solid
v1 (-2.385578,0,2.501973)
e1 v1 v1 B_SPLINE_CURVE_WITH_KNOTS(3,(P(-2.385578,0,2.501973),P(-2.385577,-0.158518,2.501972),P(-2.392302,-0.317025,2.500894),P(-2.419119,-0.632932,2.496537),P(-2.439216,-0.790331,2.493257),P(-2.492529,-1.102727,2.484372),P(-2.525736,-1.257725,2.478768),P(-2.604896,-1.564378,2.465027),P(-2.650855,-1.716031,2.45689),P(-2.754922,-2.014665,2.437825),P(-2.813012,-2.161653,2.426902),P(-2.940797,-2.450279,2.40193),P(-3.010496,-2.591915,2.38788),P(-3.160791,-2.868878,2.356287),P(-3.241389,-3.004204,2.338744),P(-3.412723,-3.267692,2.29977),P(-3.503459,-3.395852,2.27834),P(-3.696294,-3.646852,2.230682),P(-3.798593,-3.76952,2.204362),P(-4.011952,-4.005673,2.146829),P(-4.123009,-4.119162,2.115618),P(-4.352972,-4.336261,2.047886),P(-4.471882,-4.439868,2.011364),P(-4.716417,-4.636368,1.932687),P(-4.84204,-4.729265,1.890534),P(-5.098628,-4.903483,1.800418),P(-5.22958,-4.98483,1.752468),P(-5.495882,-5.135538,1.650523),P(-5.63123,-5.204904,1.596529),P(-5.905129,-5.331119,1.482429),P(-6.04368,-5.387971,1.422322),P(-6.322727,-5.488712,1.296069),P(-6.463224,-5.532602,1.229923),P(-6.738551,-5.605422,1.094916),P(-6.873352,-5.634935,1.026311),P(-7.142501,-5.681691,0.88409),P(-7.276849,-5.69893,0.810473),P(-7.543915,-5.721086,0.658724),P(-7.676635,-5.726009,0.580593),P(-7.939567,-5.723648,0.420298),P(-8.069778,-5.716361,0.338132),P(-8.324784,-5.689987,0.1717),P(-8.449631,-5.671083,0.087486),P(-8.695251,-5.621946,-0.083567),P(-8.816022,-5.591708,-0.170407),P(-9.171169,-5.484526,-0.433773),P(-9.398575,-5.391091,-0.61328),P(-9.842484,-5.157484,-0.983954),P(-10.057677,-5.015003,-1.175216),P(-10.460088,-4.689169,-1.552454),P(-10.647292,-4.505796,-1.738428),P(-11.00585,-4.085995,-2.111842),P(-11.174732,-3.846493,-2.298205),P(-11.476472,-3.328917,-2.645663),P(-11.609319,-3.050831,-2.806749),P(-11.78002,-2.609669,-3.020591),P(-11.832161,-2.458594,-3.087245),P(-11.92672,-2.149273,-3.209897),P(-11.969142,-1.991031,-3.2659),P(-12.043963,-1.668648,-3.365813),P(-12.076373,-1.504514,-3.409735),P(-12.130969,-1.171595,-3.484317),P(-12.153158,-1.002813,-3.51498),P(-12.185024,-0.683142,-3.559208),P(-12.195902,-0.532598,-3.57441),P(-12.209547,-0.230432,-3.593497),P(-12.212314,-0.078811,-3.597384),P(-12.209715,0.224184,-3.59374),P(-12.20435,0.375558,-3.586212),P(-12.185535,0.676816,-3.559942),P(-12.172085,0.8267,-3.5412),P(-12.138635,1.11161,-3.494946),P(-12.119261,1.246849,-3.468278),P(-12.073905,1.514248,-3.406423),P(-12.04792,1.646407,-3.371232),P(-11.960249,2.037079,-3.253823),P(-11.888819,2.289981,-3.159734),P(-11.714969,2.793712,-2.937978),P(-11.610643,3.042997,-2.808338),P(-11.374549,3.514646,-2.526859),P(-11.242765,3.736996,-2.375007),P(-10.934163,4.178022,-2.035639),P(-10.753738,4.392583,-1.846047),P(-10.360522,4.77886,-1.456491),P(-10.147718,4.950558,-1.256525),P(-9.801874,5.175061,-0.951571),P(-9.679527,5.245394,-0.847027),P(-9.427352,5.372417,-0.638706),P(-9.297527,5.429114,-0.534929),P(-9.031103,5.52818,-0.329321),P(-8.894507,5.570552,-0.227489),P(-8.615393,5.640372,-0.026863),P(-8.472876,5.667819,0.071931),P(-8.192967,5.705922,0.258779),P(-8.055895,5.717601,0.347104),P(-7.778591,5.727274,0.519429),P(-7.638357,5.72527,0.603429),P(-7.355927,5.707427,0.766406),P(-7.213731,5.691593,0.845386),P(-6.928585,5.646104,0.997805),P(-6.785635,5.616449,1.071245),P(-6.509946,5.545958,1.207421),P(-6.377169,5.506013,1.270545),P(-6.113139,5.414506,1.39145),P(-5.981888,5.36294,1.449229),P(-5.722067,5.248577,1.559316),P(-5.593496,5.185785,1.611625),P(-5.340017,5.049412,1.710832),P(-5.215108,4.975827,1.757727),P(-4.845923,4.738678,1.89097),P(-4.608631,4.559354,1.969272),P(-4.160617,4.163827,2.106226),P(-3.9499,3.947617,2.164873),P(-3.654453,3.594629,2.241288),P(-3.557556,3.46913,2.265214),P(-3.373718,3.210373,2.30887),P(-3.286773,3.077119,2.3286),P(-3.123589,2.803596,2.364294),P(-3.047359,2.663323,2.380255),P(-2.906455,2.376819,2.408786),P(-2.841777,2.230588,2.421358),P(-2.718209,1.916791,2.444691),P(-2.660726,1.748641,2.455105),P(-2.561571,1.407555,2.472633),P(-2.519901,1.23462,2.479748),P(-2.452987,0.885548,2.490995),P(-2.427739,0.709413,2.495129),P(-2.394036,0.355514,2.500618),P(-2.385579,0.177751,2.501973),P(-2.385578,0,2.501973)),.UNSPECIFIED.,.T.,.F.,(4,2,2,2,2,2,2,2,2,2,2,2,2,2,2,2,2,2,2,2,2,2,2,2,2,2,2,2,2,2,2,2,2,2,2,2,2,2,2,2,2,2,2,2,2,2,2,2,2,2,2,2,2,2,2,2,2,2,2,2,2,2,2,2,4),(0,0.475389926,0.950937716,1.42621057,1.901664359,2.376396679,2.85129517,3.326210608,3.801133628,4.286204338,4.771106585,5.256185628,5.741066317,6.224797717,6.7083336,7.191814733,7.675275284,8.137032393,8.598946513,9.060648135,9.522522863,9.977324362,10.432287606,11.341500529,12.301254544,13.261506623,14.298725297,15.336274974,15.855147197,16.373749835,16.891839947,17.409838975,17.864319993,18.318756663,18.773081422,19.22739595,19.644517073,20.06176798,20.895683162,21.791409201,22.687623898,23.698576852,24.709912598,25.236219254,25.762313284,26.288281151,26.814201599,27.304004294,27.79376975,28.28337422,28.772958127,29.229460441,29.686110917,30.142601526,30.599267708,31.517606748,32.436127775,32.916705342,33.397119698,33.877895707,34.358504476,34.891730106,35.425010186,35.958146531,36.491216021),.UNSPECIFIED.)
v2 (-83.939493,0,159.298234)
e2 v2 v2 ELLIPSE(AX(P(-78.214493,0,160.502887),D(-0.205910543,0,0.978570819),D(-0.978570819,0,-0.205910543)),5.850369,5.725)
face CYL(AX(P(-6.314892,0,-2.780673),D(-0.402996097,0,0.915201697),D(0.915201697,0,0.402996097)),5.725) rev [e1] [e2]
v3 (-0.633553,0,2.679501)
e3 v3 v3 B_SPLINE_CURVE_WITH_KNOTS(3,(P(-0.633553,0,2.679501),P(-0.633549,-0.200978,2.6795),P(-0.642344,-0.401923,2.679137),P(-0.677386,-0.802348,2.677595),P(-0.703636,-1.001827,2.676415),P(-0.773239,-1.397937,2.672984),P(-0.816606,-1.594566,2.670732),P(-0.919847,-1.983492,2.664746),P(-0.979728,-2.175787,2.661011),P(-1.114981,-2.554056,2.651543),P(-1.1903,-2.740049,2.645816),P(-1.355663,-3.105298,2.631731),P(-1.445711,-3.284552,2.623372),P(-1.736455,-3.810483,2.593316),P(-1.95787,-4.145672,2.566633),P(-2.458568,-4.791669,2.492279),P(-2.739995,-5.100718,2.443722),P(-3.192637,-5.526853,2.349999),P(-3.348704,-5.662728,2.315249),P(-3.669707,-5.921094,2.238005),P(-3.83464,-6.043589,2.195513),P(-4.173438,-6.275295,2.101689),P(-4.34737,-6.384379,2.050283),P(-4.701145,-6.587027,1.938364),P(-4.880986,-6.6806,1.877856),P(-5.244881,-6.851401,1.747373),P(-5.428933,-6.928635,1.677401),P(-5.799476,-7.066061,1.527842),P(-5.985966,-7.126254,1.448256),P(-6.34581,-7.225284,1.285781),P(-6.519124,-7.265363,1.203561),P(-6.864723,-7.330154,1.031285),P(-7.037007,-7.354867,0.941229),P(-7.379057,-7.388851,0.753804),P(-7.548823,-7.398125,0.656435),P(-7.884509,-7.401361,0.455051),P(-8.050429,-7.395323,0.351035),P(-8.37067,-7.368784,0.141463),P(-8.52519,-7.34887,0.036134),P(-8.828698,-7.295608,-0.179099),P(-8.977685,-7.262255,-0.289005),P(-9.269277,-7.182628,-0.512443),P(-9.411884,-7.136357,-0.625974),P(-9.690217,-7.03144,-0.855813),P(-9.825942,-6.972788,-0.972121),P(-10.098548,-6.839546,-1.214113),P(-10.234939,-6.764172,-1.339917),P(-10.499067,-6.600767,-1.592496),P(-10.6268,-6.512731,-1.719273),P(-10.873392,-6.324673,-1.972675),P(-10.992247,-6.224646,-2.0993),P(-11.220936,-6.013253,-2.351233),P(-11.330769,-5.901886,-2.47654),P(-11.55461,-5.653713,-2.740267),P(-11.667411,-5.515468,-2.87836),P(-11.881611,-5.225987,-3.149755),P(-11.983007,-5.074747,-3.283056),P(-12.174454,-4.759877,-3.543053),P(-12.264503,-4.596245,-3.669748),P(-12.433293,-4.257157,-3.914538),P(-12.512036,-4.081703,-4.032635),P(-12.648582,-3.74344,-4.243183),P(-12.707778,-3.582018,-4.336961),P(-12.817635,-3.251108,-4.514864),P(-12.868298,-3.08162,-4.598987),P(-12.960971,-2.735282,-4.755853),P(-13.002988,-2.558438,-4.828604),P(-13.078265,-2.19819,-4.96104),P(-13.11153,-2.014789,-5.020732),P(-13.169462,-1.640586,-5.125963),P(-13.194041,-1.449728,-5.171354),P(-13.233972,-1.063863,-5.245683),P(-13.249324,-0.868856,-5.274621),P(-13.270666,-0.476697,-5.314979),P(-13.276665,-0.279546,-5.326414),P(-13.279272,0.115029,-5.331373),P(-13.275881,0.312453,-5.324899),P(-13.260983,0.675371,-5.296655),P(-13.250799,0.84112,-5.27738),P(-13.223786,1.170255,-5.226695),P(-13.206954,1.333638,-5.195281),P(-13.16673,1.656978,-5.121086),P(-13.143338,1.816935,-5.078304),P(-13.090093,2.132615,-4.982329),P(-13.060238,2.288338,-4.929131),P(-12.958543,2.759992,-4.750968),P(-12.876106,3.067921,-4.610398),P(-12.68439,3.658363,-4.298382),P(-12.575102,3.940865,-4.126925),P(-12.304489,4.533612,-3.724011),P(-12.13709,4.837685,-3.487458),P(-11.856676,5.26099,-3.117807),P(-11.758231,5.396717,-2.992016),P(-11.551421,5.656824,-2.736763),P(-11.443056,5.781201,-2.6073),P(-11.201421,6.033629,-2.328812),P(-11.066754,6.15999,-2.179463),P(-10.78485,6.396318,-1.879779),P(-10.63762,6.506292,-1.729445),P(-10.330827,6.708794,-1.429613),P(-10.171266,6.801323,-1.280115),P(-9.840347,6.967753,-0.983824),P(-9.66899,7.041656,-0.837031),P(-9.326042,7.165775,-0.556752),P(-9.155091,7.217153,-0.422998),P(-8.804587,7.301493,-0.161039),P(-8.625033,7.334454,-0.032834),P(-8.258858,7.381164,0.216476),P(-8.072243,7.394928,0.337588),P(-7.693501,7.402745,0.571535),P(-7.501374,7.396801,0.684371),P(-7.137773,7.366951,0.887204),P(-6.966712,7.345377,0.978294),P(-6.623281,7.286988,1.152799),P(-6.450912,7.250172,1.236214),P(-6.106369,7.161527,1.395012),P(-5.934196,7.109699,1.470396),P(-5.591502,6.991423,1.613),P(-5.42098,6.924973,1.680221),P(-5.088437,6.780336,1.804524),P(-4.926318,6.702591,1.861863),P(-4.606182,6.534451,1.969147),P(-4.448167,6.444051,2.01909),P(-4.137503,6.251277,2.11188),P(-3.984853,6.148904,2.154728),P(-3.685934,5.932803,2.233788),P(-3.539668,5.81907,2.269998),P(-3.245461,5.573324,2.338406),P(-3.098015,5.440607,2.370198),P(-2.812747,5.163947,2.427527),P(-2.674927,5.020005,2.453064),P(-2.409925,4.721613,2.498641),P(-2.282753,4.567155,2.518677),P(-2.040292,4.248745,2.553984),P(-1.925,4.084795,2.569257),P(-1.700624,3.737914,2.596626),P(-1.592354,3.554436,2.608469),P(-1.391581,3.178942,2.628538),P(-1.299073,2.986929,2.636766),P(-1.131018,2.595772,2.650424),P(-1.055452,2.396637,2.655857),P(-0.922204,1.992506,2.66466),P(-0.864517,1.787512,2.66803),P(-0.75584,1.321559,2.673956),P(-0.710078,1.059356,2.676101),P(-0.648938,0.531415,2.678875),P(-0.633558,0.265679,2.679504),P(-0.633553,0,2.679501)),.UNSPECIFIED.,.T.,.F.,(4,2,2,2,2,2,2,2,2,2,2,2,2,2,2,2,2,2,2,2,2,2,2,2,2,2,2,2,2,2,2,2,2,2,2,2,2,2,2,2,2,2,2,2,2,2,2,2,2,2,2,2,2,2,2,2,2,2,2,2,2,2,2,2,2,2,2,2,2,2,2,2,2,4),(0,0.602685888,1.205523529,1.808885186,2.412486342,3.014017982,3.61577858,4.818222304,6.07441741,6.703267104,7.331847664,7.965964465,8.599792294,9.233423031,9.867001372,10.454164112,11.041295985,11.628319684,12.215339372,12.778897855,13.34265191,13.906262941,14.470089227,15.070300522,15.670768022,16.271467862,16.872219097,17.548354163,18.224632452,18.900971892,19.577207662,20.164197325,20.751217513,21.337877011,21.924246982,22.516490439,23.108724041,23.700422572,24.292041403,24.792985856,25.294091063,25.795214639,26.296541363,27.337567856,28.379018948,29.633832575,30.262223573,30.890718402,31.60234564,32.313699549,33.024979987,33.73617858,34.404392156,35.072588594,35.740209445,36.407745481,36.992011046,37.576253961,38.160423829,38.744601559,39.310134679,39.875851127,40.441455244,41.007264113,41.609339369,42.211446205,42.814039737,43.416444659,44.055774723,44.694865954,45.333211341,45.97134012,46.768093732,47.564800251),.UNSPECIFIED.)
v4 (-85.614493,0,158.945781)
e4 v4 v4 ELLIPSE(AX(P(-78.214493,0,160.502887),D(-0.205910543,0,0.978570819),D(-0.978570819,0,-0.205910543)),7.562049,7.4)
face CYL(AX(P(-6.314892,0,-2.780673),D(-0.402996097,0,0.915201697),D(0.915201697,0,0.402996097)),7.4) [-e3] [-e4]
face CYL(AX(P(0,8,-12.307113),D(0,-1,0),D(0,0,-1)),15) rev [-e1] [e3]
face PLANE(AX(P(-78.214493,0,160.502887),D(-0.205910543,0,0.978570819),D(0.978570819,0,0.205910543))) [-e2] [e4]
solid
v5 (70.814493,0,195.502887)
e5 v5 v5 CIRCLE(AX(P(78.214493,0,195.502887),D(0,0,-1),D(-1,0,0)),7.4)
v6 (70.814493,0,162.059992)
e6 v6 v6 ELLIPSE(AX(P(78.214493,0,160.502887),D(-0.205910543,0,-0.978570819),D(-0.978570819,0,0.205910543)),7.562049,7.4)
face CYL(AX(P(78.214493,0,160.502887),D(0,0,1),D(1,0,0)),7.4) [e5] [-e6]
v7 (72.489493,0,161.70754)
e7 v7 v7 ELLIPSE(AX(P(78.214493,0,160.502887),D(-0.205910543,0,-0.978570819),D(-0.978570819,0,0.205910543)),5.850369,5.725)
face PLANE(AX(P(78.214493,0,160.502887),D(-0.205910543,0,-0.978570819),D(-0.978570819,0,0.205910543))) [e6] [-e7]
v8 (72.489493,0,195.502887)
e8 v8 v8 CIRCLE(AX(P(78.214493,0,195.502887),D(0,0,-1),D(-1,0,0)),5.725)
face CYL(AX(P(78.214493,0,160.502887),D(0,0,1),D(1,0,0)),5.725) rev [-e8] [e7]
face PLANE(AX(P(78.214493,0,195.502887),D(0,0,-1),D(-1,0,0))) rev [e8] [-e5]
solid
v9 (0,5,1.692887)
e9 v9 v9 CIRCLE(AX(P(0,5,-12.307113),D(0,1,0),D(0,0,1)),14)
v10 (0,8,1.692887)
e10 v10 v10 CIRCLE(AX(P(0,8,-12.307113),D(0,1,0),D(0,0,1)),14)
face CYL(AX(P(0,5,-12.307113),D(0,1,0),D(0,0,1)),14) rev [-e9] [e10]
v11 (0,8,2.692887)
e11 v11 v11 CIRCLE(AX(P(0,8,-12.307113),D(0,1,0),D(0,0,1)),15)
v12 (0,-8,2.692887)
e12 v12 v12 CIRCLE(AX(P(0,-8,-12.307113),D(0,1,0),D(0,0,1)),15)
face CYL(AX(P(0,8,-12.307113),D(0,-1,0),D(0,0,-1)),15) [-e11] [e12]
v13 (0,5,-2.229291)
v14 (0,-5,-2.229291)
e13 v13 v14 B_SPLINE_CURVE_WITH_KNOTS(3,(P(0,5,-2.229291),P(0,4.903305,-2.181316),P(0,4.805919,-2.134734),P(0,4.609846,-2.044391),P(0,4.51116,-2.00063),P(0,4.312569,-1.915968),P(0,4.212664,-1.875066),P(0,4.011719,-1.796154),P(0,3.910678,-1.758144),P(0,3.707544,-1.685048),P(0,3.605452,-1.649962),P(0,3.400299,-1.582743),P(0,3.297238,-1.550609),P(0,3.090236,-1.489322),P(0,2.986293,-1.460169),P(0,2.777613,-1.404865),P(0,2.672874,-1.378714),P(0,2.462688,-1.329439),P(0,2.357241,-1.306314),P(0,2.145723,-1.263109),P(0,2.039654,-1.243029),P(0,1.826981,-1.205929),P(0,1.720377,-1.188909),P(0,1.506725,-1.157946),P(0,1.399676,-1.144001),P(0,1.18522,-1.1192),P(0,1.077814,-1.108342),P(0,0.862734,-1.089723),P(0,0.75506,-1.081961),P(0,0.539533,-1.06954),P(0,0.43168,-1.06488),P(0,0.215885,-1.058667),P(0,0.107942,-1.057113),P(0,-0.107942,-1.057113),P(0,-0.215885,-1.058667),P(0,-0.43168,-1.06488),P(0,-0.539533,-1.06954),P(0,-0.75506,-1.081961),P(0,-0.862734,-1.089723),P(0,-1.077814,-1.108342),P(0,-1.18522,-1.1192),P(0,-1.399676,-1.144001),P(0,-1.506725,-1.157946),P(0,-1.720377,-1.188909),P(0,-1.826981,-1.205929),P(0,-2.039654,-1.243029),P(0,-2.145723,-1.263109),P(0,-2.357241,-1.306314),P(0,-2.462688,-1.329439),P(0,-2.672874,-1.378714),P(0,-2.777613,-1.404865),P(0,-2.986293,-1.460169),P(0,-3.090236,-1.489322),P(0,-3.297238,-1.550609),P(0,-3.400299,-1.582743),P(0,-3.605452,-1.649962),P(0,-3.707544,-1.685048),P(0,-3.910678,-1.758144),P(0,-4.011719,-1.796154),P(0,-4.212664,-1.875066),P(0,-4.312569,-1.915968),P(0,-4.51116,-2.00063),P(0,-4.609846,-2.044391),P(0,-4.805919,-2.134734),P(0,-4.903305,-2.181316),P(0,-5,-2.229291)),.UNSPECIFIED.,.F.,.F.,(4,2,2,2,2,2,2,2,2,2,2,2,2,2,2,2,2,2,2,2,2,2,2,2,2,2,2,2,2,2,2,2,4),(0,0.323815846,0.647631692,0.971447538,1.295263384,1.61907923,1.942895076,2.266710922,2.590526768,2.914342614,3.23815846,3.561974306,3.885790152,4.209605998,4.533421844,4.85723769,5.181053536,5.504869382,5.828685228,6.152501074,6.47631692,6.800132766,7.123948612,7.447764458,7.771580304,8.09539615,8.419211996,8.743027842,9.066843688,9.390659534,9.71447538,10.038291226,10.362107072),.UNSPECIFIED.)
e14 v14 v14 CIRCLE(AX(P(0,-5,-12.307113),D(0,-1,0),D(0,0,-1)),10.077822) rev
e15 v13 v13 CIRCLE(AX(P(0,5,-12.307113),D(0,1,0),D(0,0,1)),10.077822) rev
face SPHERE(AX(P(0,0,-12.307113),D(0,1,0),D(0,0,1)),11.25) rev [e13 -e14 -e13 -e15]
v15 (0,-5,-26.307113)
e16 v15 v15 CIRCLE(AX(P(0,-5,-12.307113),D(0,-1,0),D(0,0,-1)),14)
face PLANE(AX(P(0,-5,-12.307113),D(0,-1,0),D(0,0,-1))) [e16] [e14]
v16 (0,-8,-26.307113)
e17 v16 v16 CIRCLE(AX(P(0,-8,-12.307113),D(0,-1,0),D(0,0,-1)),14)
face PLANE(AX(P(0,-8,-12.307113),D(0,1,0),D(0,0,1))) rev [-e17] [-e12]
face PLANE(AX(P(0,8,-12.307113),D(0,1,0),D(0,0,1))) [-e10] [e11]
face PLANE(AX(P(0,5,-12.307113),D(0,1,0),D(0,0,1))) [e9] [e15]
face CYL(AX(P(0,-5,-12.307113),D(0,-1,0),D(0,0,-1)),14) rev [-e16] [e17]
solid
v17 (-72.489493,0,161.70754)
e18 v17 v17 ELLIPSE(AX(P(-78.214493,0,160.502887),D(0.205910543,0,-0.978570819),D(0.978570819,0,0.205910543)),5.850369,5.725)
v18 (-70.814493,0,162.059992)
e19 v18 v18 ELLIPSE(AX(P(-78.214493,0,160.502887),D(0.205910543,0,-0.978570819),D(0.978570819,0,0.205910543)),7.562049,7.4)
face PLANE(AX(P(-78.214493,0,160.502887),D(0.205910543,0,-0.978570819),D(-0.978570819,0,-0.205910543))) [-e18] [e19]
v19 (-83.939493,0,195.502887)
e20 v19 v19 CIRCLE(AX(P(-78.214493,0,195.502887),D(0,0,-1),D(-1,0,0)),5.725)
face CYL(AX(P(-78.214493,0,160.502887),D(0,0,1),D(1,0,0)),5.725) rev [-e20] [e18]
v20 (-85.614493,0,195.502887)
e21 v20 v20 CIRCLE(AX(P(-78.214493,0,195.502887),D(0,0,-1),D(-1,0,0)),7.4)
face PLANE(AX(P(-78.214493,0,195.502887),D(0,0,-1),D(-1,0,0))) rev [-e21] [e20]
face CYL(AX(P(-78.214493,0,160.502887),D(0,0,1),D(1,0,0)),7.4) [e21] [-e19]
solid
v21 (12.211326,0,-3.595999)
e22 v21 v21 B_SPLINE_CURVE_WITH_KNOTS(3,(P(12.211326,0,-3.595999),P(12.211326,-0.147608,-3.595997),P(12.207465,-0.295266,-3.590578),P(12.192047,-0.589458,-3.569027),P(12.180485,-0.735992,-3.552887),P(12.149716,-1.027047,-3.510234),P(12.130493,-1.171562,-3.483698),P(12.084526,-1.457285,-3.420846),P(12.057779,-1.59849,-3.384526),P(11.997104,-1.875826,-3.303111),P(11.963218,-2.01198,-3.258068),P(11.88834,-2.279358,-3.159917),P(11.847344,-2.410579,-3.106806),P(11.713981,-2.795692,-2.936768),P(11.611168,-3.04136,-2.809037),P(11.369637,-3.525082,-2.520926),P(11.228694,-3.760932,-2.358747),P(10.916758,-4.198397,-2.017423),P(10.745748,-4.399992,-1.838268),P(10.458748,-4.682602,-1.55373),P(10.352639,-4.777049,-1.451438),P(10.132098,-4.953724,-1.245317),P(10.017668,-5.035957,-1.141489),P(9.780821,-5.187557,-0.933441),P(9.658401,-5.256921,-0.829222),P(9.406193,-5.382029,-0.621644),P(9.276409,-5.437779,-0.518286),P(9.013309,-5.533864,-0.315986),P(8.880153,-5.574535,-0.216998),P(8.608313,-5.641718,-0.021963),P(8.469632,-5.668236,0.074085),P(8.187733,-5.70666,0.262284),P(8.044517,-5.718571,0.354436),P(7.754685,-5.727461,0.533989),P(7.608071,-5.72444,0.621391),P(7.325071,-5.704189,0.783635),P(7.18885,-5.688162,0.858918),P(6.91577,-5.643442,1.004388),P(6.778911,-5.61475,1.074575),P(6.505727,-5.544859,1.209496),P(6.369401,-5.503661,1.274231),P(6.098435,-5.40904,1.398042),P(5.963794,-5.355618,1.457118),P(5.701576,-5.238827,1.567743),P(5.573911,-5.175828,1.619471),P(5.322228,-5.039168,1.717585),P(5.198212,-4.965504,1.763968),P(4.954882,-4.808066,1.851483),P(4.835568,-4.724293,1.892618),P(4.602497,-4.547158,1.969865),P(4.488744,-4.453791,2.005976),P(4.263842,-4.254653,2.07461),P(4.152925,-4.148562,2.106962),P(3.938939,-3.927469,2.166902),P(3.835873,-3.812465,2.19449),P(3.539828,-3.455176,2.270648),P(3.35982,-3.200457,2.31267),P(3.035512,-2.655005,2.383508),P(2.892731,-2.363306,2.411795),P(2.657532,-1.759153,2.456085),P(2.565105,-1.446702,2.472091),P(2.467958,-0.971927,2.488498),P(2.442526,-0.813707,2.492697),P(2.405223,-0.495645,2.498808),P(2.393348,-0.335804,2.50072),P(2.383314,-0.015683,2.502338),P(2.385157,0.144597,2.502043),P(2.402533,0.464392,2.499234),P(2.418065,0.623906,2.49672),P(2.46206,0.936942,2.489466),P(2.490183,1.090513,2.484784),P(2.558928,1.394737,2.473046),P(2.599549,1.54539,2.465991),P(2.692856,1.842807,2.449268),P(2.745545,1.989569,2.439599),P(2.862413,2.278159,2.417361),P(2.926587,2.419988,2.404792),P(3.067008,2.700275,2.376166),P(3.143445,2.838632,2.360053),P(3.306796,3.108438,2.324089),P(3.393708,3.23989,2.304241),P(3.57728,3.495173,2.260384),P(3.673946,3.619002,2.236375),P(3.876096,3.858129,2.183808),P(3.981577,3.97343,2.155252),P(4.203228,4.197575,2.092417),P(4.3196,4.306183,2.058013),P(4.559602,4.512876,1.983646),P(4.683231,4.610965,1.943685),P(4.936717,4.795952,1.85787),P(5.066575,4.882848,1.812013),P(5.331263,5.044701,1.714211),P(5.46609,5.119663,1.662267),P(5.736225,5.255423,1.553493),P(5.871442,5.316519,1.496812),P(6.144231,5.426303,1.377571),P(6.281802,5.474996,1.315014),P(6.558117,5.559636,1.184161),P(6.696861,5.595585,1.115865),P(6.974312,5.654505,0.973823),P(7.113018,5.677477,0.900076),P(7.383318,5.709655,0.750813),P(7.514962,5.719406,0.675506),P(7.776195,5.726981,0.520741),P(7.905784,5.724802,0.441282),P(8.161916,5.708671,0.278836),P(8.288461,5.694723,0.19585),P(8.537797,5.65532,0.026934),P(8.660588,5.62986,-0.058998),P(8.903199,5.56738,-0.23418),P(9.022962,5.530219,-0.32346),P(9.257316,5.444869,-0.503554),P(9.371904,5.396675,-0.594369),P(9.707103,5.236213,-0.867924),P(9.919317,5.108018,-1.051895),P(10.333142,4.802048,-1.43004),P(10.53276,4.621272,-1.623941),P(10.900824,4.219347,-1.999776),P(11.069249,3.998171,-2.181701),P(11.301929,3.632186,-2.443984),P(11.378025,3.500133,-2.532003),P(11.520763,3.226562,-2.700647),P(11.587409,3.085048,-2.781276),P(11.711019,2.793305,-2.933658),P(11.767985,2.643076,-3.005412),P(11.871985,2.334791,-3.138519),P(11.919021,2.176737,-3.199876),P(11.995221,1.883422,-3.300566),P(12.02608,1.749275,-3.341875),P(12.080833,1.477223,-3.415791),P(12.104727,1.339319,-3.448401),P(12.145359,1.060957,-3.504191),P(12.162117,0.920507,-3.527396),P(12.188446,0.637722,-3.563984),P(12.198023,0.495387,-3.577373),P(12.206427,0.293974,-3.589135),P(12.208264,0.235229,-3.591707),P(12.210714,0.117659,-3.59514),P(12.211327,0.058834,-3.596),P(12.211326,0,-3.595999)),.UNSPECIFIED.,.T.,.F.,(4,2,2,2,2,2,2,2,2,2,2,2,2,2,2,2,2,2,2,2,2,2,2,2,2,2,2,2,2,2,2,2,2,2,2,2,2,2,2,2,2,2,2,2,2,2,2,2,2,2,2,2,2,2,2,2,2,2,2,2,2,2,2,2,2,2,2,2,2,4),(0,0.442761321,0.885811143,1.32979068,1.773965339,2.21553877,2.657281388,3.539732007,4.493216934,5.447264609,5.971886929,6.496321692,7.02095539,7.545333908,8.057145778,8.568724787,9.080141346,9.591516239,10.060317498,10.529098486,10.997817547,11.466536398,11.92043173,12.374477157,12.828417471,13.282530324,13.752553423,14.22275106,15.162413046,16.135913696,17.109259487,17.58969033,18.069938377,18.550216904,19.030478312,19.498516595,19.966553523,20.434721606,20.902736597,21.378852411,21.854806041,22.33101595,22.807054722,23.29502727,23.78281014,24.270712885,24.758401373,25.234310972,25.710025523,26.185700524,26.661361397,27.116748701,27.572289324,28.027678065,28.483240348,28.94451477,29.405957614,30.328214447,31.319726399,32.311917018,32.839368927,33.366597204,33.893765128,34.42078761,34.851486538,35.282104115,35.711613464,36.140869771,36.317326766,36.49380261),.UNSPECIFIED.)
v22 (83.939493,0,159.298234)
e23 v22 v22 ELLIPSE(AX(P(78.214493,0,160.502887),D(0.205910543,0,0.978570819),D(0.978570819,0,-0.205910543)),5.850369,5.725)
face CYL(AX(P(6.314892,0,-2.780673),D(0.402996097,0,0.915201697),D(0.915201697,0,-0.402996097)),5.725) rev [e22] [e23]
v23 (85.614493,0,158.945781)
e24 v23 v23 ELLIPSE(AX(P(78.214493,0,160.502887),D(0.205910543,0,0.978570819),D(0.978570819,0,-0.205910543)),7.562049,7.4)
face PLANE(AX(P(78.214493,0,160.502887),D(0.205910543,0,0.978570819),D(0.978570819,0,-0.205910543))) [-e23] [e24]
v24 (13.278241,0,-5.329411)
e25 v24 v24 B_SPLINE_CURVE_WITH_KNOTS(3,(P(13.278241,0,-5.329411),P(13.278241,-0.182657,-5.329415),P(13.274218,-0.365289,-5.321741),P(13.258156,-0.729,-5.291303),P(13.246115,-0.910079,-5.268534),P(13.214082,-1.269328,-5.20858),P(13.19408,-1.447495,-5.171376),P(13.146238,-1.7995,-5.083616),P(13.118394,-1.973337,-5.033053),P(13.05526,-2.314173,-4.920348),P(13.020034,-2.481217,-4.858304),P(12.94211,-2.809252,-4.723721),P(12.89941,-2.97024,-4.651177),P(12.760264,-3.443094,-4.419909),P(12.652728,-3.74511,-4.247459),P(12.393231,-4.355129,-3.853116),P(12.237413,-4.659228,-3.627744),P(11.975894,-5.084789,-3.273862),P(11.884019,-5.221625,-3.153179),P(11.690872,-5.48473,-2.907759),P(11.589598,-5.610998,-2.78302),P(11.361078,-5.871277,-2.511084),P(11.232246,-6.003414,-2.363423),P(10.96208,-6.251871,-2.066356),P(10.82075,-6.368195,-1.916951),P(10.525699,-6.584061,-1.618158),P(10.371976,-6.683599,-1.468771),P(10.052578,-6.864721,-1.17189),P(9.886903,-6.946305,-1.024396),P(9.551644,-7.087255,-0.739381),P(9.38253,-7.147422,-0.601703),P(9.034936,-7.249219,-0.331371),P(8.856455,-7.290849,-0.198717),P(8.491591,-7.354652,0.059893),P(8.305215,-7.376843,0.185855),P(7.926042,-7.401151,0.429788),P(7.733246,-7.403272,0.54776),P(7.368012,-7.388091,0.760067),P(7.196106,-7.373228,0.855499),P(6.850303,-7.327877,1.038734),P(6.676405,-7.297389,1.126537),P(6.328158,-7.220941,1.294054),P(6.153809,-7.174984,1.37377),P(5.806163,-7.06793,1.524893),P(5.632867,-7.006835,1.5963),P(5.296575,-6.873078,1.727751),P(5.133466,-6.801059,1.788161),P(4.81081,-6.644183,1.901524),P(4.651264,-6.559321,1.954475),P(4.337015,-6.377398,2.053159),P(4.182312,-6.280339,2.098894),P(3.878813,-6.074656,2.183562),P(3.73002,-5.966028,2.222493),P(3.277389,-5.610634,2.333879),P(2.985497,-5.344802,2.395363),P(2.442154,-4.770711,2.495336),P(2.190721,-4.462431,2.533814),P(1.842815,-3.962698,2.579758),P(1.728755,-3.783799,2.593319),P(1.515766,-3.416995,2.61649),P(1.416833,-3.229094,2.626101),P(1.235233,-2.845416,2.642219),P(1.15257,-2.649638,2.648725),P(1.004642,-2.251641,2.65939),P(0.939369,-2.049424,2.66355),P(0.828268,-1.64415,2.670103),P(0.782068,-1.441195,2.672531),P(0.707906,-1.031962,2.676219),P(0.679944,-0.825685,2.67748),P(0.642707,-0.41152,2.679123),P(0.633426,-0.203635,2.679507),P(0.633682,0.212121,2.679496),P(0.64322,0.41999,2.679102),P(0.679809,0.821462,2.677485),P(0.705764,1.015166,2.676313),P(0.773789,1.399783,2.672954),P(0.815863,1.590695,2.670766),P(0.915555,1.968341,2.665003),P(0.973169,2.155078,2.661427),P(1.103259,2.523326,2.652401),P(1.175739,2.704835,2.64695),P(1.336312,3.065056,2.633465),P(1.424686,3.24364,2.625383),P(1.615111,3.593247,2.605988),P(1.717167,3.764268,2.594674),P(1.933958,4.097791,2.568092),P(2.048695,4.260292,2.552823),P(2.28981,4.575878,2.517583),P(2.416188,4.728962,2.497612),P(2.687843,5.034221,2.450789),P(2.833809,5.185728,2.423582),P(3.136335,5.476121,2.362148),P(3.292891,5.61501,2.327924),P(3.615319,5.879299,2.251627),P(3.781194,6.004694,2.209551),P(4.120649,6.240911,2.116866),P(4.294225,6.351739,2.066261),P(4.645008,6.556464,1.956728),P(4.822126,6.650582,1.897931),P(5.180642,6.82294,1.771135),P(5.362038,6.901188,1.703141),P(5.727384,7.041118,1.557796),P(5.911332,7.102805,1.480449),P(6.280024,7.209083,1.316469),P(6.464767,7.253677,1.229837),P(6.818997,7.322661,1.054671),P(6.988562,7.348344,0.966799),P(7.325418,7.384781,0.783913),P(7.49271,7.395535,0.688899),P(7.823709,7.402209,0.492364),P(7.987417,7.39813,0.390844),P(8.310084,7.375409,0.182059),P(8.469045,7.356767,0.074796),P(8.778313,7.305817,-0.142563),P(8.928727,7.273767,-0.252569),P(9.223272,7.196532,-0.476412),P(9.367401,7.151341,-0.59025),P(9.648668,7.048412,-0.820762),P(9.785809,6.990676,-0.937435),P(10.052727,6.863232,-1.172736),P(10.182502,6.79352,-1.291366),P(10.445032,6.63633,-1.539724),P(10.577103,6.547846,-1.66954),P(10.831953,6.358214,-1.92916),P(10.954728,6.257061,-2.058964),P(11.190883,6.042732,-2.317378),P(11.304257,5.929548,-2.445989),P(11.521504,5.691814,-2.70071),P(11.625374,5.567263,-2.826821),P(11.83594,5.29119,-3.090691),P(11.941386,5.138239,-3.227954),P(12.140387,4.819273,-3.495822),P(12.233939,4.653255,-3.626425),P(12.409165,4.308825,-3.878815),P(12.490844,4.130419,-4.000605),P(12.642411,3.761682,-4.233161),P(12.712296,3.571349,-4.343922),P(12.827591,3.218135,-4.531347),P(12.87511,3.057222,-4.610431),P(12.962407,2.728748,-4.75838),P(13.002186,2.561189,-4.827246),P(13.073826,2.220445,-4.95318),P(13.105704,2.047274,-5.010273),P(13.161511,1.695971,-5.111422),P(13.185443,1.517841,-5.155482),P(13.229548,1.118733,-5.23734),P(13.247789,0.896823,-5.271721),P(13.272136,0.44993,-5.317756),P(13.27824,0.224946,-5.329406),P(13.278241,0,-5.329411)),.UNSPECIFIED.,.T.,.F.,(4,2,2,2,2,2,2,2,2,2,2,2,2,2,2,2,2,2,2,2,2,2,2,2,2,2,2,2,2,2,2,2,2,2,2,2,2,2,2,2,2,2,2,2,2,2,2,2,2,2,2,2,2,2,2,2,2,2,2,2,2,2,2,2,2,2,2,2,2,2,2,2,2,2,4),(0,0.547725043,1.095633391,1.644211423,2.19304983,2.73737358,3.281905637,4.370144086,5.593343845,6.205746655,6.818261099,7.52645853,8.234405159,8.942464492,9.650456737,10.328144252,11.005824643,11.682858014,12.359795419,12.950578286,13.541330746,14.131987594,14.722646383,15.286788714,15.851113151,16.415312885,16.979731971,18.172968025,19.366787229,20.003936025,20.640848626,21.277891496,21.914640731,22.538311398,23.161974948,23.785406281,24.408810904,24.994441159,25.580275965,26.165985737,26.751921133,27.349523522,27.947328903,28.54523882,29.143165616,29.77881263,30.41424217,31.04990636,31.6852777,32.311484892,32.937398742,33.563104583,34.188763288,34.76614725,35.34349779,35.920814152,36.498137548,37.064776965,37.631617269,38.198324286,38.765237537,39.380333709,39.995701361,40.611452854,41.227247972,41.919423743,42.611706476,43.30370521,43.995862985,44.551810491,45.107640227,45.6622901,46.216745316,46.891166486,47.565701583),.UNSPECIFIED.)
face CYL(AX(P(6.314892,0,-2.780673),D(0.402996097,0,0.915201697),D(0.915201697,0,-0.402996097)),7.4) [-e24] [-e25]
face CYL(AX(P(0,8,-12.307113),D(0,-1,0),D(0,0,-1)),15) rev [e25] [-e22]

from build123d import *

# Parameters (mm, degrees)
SKETCH1_ON_SEGMENT_1_R                  = 7.4
SKETCH1_ON_SEGMENT_1_R_2                = 5.725
CIRCULAR_TUBE_21_3_X_2_3_1_DEPTH        = 38.202079732
CIRCULAR_TUBE_21_3_X_2_3_1_2_DEPTH      = 178.412650039
CIRCULAR_TUBE_21_3_X_2_3_1_2_DEPTH_BACK = 3.202079732
SKETCH1_R                               = 7.4
SKETCH1_R_2                             = 5.725
SKETCH11_ON_SEGMENT_1_R                 = 7.4
SKETCH11_ON_SEGMENT_1_R_2               = 5.725
CIRCULAR_TUBE_21_3_X_2_3_2_DEPTH        = 38.202079732
CIRCULAR_TUBE_21_3_X_2_3_2_2_DEPTH      = 178.412650039
CIRCULAR_TUBE_21_3_X_2_3_2_2_DEPTH_BACK = 3.202079732
SKETCH11_R                              = 7.4
SKETCH11_R_2                            = 5.725
SKETCH_1_R                              = 15
EXTRUDE_1_DEPTH                         = 8
SKETCH_5_R                              = 14
CUT_EXTRUDE_1_DEPTH                     = 3
SKETCH_7_R                              = 14
CUT_EXTRUDE_2_DEPTH                     = 3
WELD_START                              = -8
WELD_TRIM_4_DEPTH                       = 16
WELD_TRIM_4_2_DEPTH                     = 16


with BuildPart() as part:
    # Sketch1 on segment 1 (carried to segment 1) → Circular tube 21.3 X 2.3(1) (new body)
    with BuildSketch(Plane(origin=(-78.21449332, 0, 195.502886979), x_dir=(-1, 0, 0), z_dir=(0, 0, -1))):
        Circle(SKETCH1_ON_SEGMENT_1_R)
        Circle(SKETCH1_ON_SEGMENT_1_R_2, mode=Mode.SUBTRACT)
    extrude(amount=CIRCULAR_TUBE_21_3_X_2_3_1_DEPTH)

    # Circular tube 21.3 X 2.3(1) mitre 1
    split(bisect_by=Plane(origin=(-78.21449332, 0, 160.502886979), x_dir=(0, -1, 0), z_dir=(-0.205910543, 0, 0.978570819)), keep=Keep.TOP)


with BuildPart() as body_2:
    # Sketch1 → Circular tube 21.3 X 2.3_1 2 (new, two sides: drawn at the far end of the back side and taken through both)
    with BuildSketch(Plane(origin=(-78.21449332, 0, 160.502886979), x_dir=(-0.9152016968098962, 0, -0.4029960969491974), z_dir=(0.4029960969491974, 0, -0.9152016968098962)).offset(-CIRCULAR_TUBE_21_3_X_2_3_1_2_DEPTH_BACK)):
        Circle(SKETCH1_R)
        Circle(SKETCH1_R_2, mode=Mode.SUBTRACT)
    extrude(amount=CIRCULAR_TUBE_21_3_X_2_3_1_2_DEPTH + CIRCULAR_TUBE_21_3_X_2_3_1_2_DEPTH_BACK)

    # Circular tube 21.3 X 2.3_1 2 mitre 1
    split(bisect_by=Plane(origin=(-78.21449332, 0, 160.502886979), x_dir=(0, 1, 0), z_dir=(0.205910543, 0, -0.978570819)), keep=Keep.TOP)


with BuildPart() as body_3:
    # Sketch11 on segment 1 (carried to segment 1) → Circular tube 21.3 X 2.3(2) (new body)
    with BuildSketch(Plane(origin=(78.21449332, 0, 195.502886979), x_dir=(-1, 0, 0), z_dir=(0, 0, -1))):
        Circle(SKETCH11_ON_SEGMENT_1_R)
        Circle(SKETCH11_ON_SEGMENT_1_R_2, mode=Mode.SUBTRACT)
    extrude(amount=CIRCULAR_TUBE_21_3_X_2_3_2_DEPTH)

    # Circular tube 21.3 X 2.3(2) mitre 1
    split(bisect_by=Plane(origin=(78.21449332, 0, 160.502886979), x_dir=(0, -1, 0), z_dir=(0.205910543, 0, 0.978570819)), keep=Keep.TOP)


with BuildPart() as body_4:
    # Sketch11 → Circular tube 21.3 X 2.3_2 2 (new, two sides: drawn at the far end of the back side and taken through both)
    with BuildSketch(Plane(origin=(78.21449332, 0, 160.502886979), x_dir=(-0.9152016968098962, 0, 0.40299609694919775), z_dir=(-0.40299609694919775, 0, -0.9152016968098962)).offset(-CIRCULAR_TUBE_21_3_X_2_3_2_2_DEPTH_BACK)):
        Circle(SKETCH11_R)
        Circle(SKETCH11_R_2, mode=Mode.SUBTRACT)
    extrude(amount=CIRCULAR_TUBE_21_3_X_2_3_2_2_DEPTH + CIRCULAR_TUBE_21_3_X_2_3_2_2_DEPTH_BACK)

    # Circular tube 21.3 X 2.3_2 2 mitre 1
    split(bisect_by=Plane(origin=(78.21449332, 0, 160.502886979), x_dir=(0, 1, 0), z_dir=(-0.205910543, 0, -0.978570819)), keep=Keep.TOP)


with BuildPart() as body_5:
    # 스케치1 → 보스-돌출1 (new, symmetric)
    with BuildSketch(Plane(origin=(0, 0, 0), x_dir=(1, 0, 0), z_dir=(0, 1, 0))):
        with Locations(Location((0, 12.307113021, 0), (0, 0, 270))):
            Circle(SKETCH_1_R)
    extrude(amount=EXTRUDE_1_DEPTH, both=True)


with BuildPart() as cut_extrude_1_tool:
    # 스케치5 → 컷-돌출1 (new body)
    with BuildSketch(Plane(origin=(0, 8, 0), x_dir=(1, 0, 0), z_dir=(0, 1, 0))):
        with Locations(Location((0, 12.307113021, 0), (0, 0, 270))):
            Circle(SKETCH_5_R)
    extrude(amount=-CUT_EXTRUDE_1_DEPTH)


with BuildPart() as body_2_1:
    add(body_2.part)

    # 컷-돌출1: cut by cut_extrude_1_tool
    add(cut_extrude_1_tool.part, mode=Mode.SUBTRACT)


with BuildPart() as body_4_1:
    add(body_4.part)

    # 컷-돌출1: cut by cut_extrude_1_tool
    add(cut_extrude_1_tool.part, mode=Mode.SUBTRACT)


with BuildPart() as body_5_1:
    add(body_5.part)

    # 컷-돌출1: cut by cut_extrude_1_tool
    add(cut_extrude_1_tool.part, mode=Mode.SUBTRACT)


with BuildPart() as cut_extrude_2_tool:
    # 스케치7 → 컷-돌출2 (new body)
    with BuildSketch(Plane.XZ.offset(8)):
        with Locations(Location((0, -12.307113021, 0), (0, 0, 90))):
            Circle(SKETCH_7_R)
    extrude(amount=-CUT_EXTRUDE_2_DEPTH)


with BuildPart() as body_2_2:
    add(body_2_1.part)

    # 컷-돌출2: cut by cut_extrude_2_tool
    add(cut_extrude_2_tool.part, mode=Mode.SUBTRACT)

    # Weld Trim 4 2 outline → Weld Trim 4 2 (cut)
    with BuildSketch(Plane(origin=(0, 0, 0), x_dir=(1, 0, 0), z_dir=(0, 1, 0)).offset(WELD_START)):
        with BuildLine():
            ThreePointArc((-13.278559815, 5.330018407), (-8.02650701, -0.364713415), (-0.633551868, -2.679501408))
            Line((-0.633551868, -2.679501408), (2, -2.790833538))
            Line((2, -2.790833538), (2, -0.880671656))
            Line((2, -0.880671656), (0.457600848, -0.201498048))
            Line((0.457600848, -0.201498048), (-3.762869377, 1.656926203))
            Line((-3.762869377, 1.656926203), (-8.866914039, 3.904419935))
            Line((-8.866914039, 3.904419935), (-13.087384264, 5.762844186))
            Line((-13.087384264, 5.762844186), (-13.631989565, 6.002653412))
            Line((-13.631989565, 6.002653412), (-13.278559815, 5.330018407))
        make_face()
    extrude(amount=WELD_TRIM_4_2_DEPTH, mode=Mode.SUBTRACT)


with BuildPart() as body_4_2:
    add(body_4_1.part)

    # 컷-돌출2: cut by cut_extrude_2_tool
    add(cut_extrude_2_tool.part, mode=Mode.SUBTRACT)

    # Weld Trim 4: read off the stored shape, not the designer's step
    # Weld Trim 4 outline → Weld Trim 4 (cut)
    with BuildSketch(Plane(origin=(0, 0, 0), x_dir=(1, 0, 0), z_dir=(0, 1, 0)).offset(WELD_START)):
        with BuildLine():
            ThreePointArc((0.632975611, -2.679525758), (8.025973922, -0.365051065), (13.278241052, 5.329411783))
            Line((13.278241052, 5.329411783), (13.632040607, 6.002675888))
            Line((13.632040607, 6.002675888), (13.087384264, 5.762844186))
            Line((13.087384264, 5.762844186), (8.866914039, 3.904419935))
            Line((8.866914039, 3.904419935), (3.762869377, 1.656926203))
            Line((3.762869377, 1.656926203), (-0.457600848, -0.201498048))
            Line((-0.457600848, -0.201498048), (-2, -0.880671656))
            Line((-2, -0.880671656), (-2, -2.790732104))
            Line((-2, -2.790732104), (0.632975611, -2.679525758))
        make_face()
    extrude(amount=WELD_TRIM_4_DEPTH, mode=Mode.SUBTRACT)


with BuildPart() as body_5_2:
    add(body_5_1.part)

    # 컷-돌출2: cut by cut_extrude_2_tool
    add(cut_extrude_2_tool.part, mode=Mode.SUBTRACT)

    # 스케치9 → 컷-회전1 (revolve, cut)
    with BuildSketch(Plane(origin=(0, 0, 0), x_dir=(0, 0, -1), z_dir=(1, 0, 0))):
        with BuildLine():
            Line((12.307113021, -11.25), (12.307113021, 11.25))
            ThreePointArc((12.307113021, 11.25), (23.557113021, 0), (12.307113021, -11.25))
        make_face()
    revolve(axis=Axis((0, 8, -12.307113021), (0, -1, 0)), mode=Mode.SUBTRACT)


solid = Compound([part.part, body_3.part, body_2_2.part, body_4_2.part, body_5_2.part])
